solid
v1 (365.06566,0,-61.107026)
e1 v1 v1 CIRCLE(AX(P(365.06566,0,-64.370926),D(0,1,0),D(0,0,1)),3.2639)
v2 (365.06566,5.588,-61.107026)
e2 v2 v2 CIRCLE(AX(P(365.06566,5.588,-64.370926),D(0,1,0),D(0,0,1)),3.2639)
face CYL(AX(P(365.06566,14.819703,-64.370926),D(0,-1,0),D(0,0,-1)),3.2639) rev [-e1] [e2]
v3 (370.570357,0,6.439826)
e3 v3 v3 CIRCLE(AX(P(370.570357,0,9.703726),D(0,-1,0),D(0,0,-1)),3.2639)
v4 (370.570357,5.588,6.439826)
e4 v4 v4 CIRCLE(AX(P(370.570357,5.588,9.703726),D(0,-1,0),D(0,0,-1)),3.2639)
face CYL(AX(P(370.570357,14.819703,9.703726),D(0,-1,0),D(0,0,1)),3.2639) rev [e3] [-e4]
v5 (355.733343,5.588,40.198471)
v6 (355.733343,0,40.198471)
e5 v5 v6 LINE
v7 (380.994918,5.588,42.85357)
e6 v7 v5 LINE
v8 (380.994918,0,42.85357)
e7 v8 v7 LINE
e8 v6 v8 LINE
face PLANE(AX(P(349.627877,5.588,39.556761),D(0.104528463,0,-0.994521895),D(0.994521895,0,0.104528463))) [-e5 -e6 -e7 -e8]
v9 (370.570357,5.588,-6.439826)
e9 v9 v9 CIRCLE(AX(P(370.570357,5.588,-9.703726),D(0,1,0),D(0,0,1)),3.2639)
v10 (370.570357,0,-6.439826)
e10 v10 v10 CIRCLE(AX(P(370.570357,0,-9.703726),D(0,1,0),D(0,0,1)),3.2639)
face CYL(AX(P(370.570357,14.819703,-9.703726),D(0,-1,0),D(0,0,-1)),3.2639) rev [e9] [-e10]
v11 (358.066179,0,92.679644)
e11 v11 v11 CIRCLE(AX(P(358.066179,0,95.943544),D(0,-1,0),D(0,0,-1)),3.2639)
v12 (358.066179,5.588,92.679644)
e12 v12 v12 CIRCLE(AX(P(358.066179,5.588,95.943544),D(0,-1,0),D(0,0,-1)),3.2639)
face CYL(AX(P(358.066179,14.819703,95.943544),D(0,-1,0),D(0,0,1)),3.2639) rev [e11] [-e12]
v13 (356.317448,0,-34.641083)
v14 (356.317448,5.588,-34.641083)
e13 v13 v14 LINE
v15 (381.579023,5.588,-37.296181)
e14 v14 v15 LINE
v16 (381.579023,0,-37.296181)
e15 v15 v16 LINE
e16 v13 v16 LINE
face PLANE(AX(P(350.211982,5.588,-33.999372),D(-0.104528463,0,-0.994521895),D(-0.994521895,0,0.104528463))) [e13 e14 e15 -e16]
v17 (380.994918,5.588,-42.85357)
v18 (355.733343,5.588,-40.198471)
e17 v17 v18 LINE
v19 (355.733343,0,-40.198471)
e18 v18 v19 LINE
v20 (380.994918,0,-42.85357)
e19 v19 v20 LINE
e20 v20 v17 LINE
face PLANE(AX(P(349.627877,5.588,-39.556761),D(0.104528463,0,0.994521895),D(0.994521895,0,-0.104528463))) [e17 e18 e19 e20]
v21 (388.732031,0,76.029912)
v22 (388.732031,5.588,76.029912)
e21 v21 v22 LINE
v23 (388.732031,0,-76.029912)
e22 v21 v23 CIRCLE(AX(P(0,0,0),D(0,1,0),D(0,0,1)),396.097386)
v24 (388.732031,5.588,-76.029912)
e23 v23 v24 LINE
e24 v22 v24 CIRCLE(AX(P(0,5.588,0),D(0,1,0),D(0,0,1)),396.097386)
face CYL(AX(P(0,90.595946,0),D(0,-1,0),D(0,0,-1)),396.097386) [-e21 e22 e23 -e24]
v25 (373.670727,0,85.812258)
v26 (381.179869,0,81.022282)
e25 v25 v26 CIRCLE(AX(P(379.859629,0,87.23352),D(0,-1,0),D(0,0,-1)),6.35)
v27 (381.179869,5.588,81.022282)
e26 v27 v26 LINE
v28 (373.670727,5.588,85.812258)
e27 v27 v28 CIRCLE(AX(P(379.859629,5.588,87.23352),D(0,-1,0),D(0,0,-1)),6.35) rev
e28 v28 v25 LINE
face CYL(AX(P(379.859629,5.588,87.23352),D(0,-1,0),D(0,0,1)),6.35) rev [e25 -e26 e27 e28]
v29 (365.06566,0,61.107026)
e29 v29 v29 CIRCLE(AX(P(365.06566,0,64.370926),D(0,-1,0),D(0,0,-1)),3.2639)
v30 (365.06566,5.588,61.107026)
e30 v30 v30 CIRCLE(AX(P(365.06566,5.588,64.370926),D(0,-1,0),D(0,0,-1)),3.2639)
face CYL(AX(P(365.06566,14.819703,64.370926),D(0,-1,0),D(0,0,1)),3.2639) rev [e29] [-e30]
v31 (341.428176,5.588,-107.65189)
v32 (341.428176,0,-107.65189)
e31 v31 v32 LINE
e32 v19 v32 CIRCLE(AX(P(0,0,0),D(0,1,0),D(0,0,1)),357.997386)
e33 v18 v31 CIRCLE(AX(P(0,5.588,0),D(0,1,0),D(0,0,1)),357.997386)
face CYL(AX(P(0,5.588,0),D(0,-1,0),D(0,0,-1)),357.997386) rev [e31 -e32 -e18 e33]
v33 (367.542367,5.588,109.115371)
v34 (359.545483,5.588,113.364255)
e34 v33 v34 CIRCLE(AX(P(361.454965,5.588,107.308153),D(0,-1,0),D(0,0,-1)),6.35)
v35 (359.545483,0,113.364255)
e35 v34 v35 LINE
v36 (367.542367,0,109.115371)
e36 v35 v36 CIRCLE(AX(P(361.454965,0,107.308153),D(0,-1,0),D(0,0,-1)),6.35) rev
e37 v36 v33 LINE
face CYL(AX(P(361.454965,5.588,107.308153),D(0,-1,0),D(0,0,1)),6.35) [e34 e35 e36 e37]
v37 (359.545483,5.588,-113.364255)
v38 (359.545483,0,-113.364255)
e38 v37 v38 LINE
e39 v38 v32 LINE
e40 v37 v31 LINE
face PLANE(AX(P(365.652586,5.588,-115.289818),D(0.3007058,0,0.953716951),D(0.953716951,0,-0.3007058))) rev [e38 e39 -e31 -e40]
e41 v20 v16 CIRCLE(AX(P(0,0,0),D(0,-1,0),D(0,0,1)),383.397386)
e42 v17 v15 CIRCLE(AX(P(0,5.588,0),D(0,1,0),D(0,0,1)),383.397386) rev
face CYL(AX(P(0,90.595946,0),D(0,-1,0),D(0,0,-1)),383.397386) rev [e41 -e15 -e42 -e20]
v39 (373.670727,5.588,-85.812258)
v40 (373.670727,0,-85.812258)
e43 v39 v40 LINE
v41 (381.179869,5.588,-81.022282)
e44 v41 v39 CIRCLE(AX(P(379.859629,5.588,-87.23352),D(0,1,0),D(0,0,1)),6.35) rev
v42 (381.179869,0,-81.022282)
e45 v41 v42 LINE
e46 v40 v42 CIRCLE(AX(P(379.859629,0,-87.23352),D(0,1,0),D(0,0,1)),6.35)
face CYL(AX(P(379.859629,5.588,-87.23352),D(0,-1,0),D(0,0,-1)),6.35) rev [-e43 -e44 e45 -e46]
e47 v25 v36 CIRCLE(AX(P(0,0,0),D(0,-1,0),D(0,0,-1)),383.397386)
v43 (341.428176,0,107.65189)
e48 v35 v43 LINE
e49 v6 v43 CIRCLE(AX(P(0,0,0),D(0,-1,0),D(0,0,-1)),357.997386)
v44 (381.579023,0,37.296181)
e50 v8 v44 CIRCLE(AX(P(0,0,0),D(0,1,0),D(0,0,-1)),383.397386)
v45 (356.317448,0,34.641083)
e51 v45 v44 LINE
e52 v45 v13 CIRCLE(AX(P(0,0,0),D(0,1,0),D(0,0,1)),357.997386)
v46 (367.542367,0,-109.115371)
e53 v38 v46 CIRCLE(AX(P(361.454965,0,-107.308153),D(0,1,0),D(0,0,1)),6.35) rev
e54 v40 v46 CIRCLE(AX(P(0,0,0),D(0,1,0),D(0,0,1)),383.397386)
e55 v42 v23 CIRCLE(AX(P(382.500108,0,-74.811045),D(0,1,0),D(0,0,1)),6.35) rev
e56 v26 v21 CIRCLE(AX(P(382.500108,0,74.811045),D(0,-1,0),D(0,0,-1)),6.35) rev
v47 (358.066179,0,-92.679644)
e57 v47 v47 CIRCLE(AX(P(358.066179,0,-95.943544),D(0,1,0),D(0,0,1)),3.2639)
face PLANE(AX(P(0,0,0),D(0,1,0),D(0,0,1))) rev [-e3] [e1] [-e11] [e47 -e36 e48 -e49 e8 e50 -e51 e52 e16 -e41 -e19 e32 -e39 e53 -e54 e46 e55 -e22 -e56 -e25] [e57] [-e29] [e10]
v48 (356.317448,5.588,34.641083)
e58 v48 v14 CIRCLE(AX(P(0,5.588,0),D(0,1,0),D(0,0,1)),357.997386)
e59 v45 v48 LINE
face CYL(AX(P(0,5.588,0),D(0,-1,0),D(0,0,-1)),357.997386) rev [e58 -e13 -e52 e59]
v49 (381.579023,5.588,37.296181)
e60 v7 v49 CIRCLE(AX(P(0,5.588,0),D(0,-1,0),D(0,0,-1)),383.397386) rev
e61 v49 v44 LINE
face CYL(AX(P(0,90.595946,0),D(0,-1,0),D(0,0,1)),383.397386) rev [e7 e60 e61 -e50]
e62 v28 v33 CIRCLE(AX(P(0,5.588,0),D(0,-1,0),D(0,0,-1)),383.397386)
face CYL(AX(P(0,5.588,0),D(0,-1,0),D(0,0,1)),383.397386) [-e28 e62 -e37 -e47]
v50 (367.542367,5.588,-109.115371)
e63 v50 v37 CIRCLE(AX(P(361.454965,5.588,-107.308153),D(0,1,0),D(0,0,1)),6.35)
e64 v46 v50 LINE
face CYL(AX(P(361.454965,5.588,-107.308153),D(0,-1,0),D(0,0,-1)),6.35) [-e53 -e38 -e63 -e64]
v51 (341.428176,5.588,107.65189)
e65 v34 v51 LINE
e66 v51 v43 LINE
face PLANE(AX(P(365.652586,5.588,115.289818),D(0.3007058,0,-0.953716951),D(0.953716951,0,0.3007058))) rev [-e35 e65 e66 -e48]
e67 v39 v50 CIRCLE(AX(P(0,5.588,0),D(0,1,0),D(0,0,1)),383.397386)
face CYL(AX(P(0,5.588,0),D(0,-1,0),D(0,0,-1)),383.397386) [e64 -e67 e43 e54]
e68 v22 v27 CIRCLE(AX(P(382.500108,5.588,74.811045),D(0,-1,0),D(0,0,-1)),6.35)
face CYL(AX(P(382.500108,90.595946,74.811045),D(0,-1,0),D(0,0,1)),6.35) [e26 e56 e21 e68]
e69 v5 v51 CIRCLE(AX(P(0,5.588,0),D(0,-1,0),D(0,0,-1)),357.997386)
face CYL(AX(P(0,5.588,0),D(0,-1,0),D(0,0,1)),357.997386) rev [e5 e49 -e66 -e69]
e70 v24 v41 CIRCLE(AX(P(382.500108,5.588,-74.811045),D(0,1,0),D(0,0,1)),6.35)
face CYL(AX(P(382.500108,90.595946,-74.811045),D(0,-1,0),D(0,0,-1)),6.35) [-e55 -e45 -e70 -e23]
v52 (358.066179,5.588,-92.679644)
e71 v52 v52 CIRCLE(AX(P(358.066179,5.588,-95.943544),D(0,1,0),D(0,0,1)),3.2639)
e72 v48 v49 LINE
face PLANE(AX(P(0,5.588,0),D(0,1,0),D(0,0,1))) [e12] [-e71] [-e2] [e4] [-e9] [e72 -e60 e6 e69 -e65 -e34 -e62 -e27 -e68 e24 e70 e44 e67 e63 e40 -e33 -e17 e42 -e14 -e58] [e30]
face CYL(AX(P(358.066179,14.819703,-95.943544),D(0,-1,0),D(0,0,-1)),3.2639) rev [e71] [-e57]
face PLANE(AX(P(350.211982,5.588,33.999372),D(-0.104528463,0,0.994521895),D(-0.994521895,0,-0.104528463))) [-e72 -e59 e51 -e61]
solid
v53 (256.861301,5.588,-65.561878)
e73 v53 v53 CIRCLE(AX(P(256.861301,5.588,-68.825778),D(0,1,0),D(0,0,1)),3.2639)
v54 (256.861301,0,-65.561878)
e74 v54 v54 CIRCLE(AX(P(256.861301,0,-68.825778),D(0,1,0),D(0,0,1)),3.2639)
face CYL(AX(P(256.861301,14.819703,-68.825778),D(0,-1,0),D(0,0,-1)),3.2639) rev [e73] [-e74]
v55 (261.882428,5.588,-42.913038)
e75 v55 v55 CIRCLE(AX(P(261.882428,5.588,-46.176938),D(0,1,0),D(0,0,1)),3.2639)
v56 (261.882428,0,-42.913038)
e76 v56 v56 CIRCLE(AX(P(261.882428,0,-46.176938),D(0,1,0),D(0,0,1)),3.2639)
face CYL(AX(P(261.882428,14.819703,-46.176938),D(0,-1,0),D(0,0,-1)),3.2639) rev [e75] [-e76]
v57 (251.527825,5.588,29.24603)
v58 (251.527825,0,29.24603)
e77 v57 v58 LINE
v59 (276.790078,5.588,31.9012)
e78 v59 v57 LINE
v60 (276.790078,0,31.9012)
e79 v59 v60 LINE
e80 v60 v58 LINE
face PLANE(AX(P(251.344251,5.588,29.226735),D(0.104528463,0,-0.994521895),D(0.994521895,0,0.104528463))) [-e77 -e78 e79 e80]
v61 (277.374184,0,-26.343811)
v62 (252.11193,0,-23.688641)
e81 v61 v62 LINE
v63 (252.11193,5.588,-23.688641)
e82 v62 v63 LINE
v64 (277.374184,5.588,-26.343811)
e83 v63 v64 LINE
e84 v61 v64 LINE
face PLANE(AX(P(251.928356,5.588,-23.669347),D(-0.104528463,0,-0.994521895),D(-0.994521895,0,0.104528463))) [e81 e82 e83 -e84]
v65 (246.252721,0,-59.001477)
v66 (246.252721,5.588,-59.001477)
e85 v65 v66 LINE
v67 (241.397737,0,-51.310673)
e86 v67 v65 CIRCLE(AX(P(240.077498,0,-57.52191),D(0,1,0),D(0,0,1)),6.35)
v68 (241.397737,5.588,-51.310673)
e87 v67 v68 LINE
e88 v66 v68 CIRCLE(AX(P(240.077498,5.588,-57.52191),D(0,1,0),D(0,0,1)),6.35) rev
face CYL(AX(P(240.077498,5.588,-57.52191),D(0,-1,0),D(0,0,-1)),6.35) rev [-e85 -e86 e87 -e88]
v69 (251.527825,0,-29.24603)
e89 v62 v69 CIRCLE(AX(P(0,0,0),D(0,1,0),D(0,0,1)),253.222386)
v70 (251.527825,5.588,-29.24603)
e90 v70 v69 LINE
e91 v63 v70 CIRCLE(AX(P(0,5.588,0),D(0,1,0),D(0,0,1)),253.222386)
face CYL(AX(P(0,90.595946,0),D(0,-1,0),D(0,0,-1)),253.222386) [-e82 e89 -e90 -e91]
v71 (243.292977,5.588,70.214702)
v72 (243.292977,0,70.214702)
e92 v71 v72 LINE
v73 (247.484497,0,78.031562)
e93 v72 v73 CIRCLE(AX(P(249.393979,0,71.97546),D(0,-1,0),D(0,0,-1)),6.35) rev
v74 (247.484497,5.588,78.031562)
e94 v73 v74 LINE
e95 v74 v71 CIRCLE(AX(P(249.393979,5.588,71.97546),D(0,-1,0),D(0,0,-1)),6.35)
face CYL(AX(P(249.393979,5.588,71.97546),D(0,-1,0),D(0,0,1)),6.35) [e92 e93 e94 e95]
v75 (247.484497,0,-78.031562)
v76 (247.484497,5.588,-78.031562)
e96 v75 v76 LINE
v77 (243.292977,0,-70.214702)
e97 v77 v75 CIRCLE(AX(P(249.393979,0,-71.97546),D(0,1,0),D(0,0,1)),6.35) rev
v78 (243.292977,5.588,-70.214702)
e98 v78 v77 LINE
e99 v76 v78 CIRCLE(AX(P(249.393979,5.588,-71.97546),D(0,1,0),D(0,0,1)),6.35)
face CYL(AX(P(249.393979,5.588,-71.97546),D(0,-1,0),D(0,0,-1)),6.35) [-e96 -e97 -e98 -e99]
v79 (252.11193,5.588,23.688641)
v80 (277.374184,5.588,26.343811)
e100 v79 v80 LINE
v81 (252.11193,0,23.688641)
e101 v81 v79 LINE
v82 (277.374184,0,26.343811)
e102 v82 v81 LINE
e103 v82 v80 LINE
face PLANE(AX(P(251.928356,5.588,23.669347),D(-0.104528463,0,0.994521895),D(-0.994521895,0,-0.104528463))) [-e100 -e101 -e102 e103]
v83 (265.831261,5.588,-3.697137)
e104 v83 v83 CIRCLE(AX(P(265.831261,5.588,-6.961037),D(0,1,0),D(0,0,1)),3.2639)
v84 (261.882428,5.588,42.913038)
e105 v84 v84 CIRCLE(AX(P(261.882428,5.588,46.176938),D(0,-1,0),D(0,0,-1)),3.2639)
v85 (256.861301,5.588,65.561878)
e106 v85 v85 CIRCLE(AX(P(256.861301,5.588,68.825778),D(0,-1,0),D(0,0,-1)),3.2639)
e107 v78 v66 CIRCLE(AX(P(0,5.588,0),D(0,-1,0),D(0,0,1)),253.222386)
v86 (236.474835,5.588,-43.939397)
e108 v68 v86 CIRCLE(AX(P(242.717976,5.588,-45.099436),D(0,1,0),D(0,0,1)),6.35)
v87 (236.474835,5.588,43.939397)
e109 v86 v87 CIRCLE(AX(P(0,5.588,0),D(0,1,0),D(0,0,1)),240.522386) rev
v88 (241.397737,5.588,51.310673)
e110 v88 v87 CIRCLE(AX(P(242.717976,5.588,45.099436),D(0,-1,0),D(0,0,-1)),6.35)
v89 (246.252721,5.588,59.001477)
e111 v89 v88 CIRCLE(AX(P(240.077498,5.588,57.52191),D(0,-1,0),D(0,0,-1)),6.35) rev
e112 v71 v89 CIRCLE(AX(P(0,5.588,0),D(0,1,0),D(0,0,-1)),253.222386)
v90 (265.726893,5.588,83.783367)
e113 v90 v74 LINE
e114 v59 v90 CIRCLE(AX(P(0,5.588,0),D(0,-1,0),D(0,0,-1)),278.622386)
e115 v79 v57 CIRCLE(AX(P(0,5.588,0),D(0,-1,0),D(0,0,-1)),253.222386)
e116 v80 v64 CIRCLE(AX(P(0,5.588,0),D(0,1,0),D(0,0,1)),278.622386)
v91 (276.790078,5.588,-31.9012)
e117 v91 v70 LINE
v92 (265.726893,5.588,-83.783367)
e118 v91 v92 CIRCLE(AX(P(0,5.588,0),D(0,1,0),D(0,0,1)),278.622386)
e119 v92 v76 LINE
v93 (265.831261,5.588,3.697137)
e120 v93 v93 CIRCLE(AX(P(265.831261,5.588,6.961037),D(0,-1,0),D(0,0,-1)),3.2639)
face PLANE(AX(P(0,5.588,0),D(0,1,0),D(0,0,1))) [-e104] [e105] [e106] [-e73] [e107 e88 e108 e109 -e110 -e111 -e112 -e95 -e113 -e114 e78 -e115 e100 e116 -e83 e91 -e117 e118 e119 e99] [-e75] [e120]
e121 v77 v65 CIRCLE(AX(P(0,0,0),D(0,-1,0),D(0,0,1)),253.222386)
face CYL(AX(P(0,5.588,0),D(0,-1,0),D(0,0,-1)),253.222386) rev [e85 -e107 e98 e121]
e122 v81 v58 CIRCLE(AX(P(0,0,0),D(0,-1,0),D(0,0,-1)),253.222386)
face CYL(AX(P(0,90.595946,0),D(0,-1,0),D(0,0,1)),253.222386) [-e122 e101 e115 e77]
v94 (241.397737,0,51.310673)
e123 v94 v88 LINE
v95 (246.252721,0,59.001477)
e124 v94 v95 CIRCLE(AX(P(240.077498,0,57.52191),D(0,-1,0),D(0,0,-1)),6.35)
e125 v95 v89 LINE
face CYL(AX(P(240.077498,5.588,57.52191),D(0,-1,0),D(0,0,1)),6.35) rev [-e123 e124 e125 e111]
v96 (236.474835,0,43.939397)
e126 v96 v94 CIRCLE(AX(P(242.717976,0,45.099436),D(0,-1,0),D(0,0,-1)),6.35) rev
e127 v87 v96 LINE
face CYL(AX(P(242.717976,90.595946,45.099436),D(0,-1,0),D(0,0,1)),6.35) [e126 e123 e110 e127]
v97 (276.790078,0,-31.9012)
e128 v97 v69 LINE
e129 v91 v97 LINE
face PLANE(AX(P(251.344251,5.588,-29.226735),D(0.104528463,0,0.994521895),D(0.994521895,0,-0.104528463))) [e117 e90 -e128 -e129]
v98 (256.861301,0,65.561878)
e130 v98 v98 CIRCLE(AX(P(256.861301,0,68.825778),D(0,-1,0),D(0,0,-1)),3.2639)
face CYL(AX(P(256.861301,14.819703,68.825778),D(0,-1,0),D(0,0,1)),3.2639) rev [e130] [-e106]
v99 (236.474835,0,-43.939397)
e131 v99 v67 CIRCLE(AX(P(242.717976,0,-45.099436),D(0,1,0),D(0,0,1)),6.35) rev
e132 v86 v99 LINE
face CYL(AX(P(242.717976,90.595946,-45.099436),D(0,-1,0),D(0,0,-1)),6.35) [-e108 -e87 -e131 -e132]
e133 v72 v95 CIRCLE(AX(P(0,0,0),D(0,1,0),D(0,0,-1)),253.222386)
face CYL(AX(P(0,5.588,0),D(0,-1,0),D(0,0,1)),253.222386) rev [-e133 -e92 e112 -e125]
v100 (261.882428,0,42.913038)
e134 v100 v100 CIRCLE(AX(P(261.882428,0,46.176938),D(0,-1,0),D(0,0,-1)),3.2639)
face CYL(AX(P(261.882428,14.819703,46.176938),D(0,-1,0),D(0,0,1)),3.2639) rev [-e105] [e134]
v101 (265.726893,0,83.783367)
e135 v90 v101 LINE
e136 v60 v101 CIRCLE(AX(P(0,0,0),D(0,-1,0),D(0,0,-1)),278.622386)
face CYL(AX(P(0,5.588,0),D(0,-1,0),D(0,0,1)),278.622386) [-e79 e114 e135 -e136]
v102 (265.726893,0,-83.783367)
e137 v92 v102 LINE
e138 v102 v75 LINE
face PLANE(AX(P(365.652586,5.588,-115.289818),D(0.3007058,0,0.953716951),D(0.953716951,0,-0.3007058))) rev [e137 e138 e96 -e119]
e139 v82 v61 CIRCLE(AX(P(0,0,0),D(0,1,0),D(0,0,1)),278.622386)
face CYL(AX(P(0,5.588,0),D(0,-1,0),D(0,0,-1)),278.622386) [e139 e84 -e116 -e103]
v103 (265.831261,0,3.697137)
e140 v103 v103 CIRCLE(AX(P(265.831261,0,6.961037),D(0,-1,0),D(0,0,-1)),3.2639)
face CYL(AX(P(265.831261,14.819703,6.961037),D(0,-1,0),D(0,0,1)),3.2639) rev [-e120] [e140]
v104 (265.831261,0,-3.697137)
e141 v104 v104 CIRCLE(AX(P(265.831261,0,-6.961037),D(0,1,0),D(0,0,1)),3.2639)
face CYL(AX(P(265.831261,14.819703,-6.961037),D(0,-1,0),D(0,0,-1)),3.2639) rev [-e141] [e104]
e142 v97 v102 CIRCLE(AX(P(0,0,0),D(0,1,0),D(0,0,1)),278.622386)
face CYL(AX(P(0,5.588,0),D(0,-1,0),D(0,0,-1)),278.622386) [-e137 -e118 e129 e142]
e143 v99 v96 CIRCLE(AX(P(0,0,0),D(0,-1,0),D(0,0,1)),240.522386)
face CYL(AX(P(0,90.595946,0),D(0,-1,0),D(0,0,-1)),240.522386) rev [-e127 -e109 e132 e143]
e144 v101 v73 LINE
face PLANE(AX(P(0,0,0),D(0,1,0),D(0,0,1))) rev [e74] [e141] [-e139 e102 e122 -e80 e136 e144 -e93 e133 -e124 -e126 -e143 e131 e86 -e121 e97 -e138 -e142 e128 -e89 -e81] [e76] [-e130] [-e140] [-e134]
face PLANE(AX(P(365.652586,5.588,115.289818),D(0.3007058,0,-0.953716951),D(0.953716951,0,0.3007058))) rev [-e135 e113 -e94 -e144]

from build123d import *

# Parameters (mm, degrees)
BOSS_EXTRUDE1_DEPTH = 5.588
SKETCH9_R           = 3.2639
CUT_EXTRUDE4_DEPTH  = 5.588
CUT_EXTRUDE3_DEPTH  = 401.395458897
BOSS_EXTRUDE2_DEPTH = 5.588
FILLET1_R           = 6.35
SKETCH12_R          = 357.997386184
SKETCH12_R_2        = 278.622386184
CUT_EXTRUDE8_DEPTH  = 413.11957813
MIRROR1_OUTLINE_R   = 3.2639
MIRROR1_DEPTH       = 5.588


# Read off the part's stored shape, not the designer's step: Mirror1
with BuildPart() as part:
    # Sketch2 → Boss-Extrude1 (new body)
    with BuildSketch(Plane(origin=(0, 0, 0), x_dir=(1, 0, 0), z_dir=(0, 1, 0))):
        with BuildLine():
            Line((365.652586076, 115.28981754), (241.502482012, 76.14544009))
            ThreePointArc((241.502482012, 76.14544009), (250.275260093, 38.521046845), (253.222386184, 0))
            Line((253.222386184, 0), (383.397386184, 0))
            ThreePointArc((383.397386184, 0), (378.935219718, 58.323708643), (365.652586076, 115.28981754))
        make_face()
    extrude(amount=BOSS_EXTRUDE1_DEPTH)

    # Sketch9 → Cut-Extrude4 (cut)
    with BuildSketch(Plane(origin=(0, 0, 0), x_dir=(1, 0, 0), z_dir=(0, 1, 0))):
        with Locations(Location((256.861300603, 68.825778063, 0), (0, 0, 270))):
            Circle(SKETCH9_R)
        with Locations(Location((261.882427613, 46.176937762, 0), (0, 0, 270))):
            Circle(SKETCH9_R)
        with Locations(Location((265.831261224, 6.961036557, 0), (0, 0, 270))):
            Circle(SKETCH9_R)
        with Locations(Location((365.065659935, 64.370925577, 0), (0, 0, 270))):
            Circle(SKETCH9_R)
        with Locations(Location((358.066179053, 95.943543514, 0), (0, 0, 270))):
            Circle(SKETCH9_R)
        with Locations(Location((370.570357448, 9.703726316, 0), (0, 0, 270))):
            Circle(SKETCH9_R)
    extrude(amount=CUT_EXTRUDE4_DEPTH, mode=Mode.SUBTRACT)

    # Sketch8 → Cut-Extrude3 (cut, through all)
    with BuildSketch(Plane(origin=(0, 0, 0), x_dir=(1, 0, 0), z_dir=(0, 1, 0))):
        Polygon((251.928355604, 23.669347024), (283.504425782, 26.988125733), (282.92032073, 32.545514085), (251.344250552, 29.226735376), align=None)
        Polygon((350.211981914, 33.999372407), (381.788052092, 37.318151116), (381.203947039, 42.875539467), (349.627876862, 39.556760758), align=None)
    extrude(amount=CUT_EXTRUDE3_DEPTH, mode=Mode.SUBTRACT)

    # Sketch11 → Boss-Extrude2 (add)
    with BuildSketch(Plane(origin=(0, 0, 0), x_dir=(1, 0, 0), z_dir=(0, 1, 0))):
        with BuildLine():
            Line((247.688869498, 52.647894464), (235.266394968, 50.007415991))
            ThreePointArc((235.266394968, 50.007415991), (239.204779386, 25.141435409), (240.522386184, 0))
            Line((240.522386184, 0), (253.222386184, 0))
            ThreePointArc((253.222386184, 0), (251.835207457, 26.468946893), (247.688869498, 52.647894464))
        make_face()
        with BuildLine():
            Line((387.441707953, 82.35327729), (375.019233423, 79.712798817))
            ThreePointArc((375.019233423, 79.712798817), (381.297095187, 40.075939599), (383.397386184, 0))
            Line((383.397386184, 0), (396.097386184, 0))
            ThreePointArc((396.097386184, 0), (393.927523258, 41.403451082), (387.441707953, 82.35327729))
        make_face()
    extrude(amount=BOSS_EXTRUDE2_DEPTH)

    # Fillet1
    fillet1_edges = [part.edges().sort_by_distance(p)[0] for p in [
        (235.266394968, 2.794, -50.007415991),
        (387.441707953, 2.794, -82.35327729),
        (375.019233423, 2.794, -79.712798817),
        (247.688869498, 2.794, -52.647894464),
        (365.652586076, 2.794, -115.28981754),
        (241.502482012, 2.794, -76.14544009),
    ]]
    fillet(fillet1_edges, radius=FILLET1_R - 0.0001)  # a hair under: the kernel refuses the full size

    # Sketch12 → Cut-Extrude8 (cut, through all)
    with BuildSketch(Plane(origin=(0, 0, 0), x_dir=(1, 0, 0), z_dir=(0, 1, 0))):
        Circle(SKETCH12_R)
        Circle(SKETCH12_R_2, mode=Mode.SUBTRACT)
    extrude(amount=CUT_EXTRUDE8_DEPTH, mode=Mode.SUBTRACT)


with BuildPart() as cut_extrude8_piece_1:
    # of the separate pieces the step leaves, piece 1, a body of its own (cut_extrude8_pieces)
    add(part.part.solids().sort_by_distance((359.545580237, 0, -113.364285996))[0])



with BuildPart() as cut_extrude8_piece_2:
    # of the separate pieces the step leaves, piece 2, a body of its own (cut_extrude8_pieces)
    add(part.part.solids().sort_by_distance((265.726892561, 0, -83.783367397))[0])


with BuildPart() as cut_extrude8_piece_1_1:
    add(cut_extrude8_piece_1.part)

    add(cut_extrude8_piece_2.part)  # Mirror1 merges Cut-Extrude8 piece 2
    # Mirror1 outline → Mirror1 (add)
    # profile 1 of 2: a face of its own
    with BuildSketch(Plane(origin=(0, 0, 0), x_dir=(1, 0, 0), z_dir=(0, 1, 0))):
        with BuildLine():
            ThreePointArc((367.542367114, -109.115370636), (370.789659245, -97.511970185), (373.670726786, -85.812258307))
            ThreePointArc((373.670726786, -85.812258307), (376.444671415, -81.879963574), (381.179868714, -81.022282272))
            ThreePointArc((381.179868714, -81.022282272), (386.001836103, -80.108251813), (388.732030913, -76.029911772))
            ThreePointArc((388.732030913, -76.029911772), (394.251747436, -38.192918003), (396.097386184, 0))
            Line((396.097386184, 0), (357.997386184, 0))
            ThreePointArc((357.997386184, 0), (357.577155049, -17.3408968), (356.31744821, -34.641082773))
            Line((356.31744821, -34.641082773), (381.579022742, -37.296181246))
            ThreePointArc((381.579022742, -37.296181246), (381.297095187, -40.075939599), (380.99491769, -42.853569597))
            Line((380.99491769, -42.853569597), (355.733343157, -40.198471124))
            ThreePointArc((355.733343157, -40.198471124), (350.208561747, -74.270396482), (341.428175527, -107.651890233))
            Line((341.428175527, -107.651890233), (359.545483246, -113.364255414))
            ThreePointArc((359.545483246, -113.364255414), (364.434396192, -112.915780636), (367.542367114, -109.115370636))
        make_face()
        with Locations((358.066179053, -95.943543514)):
            Circle(MIRROR1_OUTLINE_R, mode=Mode.SUBTRACT)
        with Locations((365.065659935, -64.370925577)):
            Circle(MIRROR1_OUTLINE_R, mode=Mode.SUBTRACT)
        with Locations((370.570357448, -9.703726316)):
            Circle(MIRROR1_OUTLINE_R, mode=Mode.SUBTRACT)
    # profile 2 of 2: a face of its own
    with BuildSketch(Plane(origin=(0, 0, 0), x_dir=(1, 0, 0), z_dir=(0, 1, 0))):
        with BuildLine():
            Line((247.484497403, -78.031562297), (265.726892561, -83.783367397))
            ThreePointArc((265.726892561, -83.783367397), (272.496065657, -58.106181121), (276.790078476, -31.90119966))
            Line((276.790078476, -31.90119966), (251.527824715, -29.246029798))
            ThreePointArc((251.527824715, -29.246029798), (251.835207457, -26.468946893), (252.111929767, -23.688641446))
            Line((252.111929767, -23.688641446), (277.374183529, -26.343811309))
            ThreePointArc((277.374183529, -26.343811309), (278.310160579, -13.186682715), (278.622386184, 0))
            Line((278.622386184, 0), (240.522386184, 0))
            ThreePointArc((240.522386184, 0), (239.50836087, -22.062713545), (236.474835046, -43.939397421))
            ThreePointArc((236.474835046, -43.939397421), (237.437341139, -48.626104602), (241.397736942, -51.310672959))
            ThreePointArc((241.397736942, -51.310672959), (245.447097835, -54.132235543), (246.252721001, -59.001476795))
            ThreePointArc((246.252721001, -59.001476795), (244.837051226, -64.625035488), (243.292976764, -70.214701609))
            ThreePointArc((243.292976764, -70.214701609), (243.797749033, -74.976244157), (247.484497403, -78.031562297))
        make_face()
        with Locations((256.861300603, -68.825778063)):
            Circle(MIRROR1_OUTLINE_R, mode=Mode.SUBTRACT)
        with Locations((261.882427613, -46.176937762)):
            Circle(MIRROR1_OUTLINE_R, mode=Mode.SUBTRACT)
        with Locations((265.831261224, -6.961036557)):
            Circle(MIRROR1_OUTLINE_R, mode=Mode.SUBTRACT)
    extrude(amount=MIRROR1_DEPTH)


solid = cut_extrude8_piece_1_1.part
